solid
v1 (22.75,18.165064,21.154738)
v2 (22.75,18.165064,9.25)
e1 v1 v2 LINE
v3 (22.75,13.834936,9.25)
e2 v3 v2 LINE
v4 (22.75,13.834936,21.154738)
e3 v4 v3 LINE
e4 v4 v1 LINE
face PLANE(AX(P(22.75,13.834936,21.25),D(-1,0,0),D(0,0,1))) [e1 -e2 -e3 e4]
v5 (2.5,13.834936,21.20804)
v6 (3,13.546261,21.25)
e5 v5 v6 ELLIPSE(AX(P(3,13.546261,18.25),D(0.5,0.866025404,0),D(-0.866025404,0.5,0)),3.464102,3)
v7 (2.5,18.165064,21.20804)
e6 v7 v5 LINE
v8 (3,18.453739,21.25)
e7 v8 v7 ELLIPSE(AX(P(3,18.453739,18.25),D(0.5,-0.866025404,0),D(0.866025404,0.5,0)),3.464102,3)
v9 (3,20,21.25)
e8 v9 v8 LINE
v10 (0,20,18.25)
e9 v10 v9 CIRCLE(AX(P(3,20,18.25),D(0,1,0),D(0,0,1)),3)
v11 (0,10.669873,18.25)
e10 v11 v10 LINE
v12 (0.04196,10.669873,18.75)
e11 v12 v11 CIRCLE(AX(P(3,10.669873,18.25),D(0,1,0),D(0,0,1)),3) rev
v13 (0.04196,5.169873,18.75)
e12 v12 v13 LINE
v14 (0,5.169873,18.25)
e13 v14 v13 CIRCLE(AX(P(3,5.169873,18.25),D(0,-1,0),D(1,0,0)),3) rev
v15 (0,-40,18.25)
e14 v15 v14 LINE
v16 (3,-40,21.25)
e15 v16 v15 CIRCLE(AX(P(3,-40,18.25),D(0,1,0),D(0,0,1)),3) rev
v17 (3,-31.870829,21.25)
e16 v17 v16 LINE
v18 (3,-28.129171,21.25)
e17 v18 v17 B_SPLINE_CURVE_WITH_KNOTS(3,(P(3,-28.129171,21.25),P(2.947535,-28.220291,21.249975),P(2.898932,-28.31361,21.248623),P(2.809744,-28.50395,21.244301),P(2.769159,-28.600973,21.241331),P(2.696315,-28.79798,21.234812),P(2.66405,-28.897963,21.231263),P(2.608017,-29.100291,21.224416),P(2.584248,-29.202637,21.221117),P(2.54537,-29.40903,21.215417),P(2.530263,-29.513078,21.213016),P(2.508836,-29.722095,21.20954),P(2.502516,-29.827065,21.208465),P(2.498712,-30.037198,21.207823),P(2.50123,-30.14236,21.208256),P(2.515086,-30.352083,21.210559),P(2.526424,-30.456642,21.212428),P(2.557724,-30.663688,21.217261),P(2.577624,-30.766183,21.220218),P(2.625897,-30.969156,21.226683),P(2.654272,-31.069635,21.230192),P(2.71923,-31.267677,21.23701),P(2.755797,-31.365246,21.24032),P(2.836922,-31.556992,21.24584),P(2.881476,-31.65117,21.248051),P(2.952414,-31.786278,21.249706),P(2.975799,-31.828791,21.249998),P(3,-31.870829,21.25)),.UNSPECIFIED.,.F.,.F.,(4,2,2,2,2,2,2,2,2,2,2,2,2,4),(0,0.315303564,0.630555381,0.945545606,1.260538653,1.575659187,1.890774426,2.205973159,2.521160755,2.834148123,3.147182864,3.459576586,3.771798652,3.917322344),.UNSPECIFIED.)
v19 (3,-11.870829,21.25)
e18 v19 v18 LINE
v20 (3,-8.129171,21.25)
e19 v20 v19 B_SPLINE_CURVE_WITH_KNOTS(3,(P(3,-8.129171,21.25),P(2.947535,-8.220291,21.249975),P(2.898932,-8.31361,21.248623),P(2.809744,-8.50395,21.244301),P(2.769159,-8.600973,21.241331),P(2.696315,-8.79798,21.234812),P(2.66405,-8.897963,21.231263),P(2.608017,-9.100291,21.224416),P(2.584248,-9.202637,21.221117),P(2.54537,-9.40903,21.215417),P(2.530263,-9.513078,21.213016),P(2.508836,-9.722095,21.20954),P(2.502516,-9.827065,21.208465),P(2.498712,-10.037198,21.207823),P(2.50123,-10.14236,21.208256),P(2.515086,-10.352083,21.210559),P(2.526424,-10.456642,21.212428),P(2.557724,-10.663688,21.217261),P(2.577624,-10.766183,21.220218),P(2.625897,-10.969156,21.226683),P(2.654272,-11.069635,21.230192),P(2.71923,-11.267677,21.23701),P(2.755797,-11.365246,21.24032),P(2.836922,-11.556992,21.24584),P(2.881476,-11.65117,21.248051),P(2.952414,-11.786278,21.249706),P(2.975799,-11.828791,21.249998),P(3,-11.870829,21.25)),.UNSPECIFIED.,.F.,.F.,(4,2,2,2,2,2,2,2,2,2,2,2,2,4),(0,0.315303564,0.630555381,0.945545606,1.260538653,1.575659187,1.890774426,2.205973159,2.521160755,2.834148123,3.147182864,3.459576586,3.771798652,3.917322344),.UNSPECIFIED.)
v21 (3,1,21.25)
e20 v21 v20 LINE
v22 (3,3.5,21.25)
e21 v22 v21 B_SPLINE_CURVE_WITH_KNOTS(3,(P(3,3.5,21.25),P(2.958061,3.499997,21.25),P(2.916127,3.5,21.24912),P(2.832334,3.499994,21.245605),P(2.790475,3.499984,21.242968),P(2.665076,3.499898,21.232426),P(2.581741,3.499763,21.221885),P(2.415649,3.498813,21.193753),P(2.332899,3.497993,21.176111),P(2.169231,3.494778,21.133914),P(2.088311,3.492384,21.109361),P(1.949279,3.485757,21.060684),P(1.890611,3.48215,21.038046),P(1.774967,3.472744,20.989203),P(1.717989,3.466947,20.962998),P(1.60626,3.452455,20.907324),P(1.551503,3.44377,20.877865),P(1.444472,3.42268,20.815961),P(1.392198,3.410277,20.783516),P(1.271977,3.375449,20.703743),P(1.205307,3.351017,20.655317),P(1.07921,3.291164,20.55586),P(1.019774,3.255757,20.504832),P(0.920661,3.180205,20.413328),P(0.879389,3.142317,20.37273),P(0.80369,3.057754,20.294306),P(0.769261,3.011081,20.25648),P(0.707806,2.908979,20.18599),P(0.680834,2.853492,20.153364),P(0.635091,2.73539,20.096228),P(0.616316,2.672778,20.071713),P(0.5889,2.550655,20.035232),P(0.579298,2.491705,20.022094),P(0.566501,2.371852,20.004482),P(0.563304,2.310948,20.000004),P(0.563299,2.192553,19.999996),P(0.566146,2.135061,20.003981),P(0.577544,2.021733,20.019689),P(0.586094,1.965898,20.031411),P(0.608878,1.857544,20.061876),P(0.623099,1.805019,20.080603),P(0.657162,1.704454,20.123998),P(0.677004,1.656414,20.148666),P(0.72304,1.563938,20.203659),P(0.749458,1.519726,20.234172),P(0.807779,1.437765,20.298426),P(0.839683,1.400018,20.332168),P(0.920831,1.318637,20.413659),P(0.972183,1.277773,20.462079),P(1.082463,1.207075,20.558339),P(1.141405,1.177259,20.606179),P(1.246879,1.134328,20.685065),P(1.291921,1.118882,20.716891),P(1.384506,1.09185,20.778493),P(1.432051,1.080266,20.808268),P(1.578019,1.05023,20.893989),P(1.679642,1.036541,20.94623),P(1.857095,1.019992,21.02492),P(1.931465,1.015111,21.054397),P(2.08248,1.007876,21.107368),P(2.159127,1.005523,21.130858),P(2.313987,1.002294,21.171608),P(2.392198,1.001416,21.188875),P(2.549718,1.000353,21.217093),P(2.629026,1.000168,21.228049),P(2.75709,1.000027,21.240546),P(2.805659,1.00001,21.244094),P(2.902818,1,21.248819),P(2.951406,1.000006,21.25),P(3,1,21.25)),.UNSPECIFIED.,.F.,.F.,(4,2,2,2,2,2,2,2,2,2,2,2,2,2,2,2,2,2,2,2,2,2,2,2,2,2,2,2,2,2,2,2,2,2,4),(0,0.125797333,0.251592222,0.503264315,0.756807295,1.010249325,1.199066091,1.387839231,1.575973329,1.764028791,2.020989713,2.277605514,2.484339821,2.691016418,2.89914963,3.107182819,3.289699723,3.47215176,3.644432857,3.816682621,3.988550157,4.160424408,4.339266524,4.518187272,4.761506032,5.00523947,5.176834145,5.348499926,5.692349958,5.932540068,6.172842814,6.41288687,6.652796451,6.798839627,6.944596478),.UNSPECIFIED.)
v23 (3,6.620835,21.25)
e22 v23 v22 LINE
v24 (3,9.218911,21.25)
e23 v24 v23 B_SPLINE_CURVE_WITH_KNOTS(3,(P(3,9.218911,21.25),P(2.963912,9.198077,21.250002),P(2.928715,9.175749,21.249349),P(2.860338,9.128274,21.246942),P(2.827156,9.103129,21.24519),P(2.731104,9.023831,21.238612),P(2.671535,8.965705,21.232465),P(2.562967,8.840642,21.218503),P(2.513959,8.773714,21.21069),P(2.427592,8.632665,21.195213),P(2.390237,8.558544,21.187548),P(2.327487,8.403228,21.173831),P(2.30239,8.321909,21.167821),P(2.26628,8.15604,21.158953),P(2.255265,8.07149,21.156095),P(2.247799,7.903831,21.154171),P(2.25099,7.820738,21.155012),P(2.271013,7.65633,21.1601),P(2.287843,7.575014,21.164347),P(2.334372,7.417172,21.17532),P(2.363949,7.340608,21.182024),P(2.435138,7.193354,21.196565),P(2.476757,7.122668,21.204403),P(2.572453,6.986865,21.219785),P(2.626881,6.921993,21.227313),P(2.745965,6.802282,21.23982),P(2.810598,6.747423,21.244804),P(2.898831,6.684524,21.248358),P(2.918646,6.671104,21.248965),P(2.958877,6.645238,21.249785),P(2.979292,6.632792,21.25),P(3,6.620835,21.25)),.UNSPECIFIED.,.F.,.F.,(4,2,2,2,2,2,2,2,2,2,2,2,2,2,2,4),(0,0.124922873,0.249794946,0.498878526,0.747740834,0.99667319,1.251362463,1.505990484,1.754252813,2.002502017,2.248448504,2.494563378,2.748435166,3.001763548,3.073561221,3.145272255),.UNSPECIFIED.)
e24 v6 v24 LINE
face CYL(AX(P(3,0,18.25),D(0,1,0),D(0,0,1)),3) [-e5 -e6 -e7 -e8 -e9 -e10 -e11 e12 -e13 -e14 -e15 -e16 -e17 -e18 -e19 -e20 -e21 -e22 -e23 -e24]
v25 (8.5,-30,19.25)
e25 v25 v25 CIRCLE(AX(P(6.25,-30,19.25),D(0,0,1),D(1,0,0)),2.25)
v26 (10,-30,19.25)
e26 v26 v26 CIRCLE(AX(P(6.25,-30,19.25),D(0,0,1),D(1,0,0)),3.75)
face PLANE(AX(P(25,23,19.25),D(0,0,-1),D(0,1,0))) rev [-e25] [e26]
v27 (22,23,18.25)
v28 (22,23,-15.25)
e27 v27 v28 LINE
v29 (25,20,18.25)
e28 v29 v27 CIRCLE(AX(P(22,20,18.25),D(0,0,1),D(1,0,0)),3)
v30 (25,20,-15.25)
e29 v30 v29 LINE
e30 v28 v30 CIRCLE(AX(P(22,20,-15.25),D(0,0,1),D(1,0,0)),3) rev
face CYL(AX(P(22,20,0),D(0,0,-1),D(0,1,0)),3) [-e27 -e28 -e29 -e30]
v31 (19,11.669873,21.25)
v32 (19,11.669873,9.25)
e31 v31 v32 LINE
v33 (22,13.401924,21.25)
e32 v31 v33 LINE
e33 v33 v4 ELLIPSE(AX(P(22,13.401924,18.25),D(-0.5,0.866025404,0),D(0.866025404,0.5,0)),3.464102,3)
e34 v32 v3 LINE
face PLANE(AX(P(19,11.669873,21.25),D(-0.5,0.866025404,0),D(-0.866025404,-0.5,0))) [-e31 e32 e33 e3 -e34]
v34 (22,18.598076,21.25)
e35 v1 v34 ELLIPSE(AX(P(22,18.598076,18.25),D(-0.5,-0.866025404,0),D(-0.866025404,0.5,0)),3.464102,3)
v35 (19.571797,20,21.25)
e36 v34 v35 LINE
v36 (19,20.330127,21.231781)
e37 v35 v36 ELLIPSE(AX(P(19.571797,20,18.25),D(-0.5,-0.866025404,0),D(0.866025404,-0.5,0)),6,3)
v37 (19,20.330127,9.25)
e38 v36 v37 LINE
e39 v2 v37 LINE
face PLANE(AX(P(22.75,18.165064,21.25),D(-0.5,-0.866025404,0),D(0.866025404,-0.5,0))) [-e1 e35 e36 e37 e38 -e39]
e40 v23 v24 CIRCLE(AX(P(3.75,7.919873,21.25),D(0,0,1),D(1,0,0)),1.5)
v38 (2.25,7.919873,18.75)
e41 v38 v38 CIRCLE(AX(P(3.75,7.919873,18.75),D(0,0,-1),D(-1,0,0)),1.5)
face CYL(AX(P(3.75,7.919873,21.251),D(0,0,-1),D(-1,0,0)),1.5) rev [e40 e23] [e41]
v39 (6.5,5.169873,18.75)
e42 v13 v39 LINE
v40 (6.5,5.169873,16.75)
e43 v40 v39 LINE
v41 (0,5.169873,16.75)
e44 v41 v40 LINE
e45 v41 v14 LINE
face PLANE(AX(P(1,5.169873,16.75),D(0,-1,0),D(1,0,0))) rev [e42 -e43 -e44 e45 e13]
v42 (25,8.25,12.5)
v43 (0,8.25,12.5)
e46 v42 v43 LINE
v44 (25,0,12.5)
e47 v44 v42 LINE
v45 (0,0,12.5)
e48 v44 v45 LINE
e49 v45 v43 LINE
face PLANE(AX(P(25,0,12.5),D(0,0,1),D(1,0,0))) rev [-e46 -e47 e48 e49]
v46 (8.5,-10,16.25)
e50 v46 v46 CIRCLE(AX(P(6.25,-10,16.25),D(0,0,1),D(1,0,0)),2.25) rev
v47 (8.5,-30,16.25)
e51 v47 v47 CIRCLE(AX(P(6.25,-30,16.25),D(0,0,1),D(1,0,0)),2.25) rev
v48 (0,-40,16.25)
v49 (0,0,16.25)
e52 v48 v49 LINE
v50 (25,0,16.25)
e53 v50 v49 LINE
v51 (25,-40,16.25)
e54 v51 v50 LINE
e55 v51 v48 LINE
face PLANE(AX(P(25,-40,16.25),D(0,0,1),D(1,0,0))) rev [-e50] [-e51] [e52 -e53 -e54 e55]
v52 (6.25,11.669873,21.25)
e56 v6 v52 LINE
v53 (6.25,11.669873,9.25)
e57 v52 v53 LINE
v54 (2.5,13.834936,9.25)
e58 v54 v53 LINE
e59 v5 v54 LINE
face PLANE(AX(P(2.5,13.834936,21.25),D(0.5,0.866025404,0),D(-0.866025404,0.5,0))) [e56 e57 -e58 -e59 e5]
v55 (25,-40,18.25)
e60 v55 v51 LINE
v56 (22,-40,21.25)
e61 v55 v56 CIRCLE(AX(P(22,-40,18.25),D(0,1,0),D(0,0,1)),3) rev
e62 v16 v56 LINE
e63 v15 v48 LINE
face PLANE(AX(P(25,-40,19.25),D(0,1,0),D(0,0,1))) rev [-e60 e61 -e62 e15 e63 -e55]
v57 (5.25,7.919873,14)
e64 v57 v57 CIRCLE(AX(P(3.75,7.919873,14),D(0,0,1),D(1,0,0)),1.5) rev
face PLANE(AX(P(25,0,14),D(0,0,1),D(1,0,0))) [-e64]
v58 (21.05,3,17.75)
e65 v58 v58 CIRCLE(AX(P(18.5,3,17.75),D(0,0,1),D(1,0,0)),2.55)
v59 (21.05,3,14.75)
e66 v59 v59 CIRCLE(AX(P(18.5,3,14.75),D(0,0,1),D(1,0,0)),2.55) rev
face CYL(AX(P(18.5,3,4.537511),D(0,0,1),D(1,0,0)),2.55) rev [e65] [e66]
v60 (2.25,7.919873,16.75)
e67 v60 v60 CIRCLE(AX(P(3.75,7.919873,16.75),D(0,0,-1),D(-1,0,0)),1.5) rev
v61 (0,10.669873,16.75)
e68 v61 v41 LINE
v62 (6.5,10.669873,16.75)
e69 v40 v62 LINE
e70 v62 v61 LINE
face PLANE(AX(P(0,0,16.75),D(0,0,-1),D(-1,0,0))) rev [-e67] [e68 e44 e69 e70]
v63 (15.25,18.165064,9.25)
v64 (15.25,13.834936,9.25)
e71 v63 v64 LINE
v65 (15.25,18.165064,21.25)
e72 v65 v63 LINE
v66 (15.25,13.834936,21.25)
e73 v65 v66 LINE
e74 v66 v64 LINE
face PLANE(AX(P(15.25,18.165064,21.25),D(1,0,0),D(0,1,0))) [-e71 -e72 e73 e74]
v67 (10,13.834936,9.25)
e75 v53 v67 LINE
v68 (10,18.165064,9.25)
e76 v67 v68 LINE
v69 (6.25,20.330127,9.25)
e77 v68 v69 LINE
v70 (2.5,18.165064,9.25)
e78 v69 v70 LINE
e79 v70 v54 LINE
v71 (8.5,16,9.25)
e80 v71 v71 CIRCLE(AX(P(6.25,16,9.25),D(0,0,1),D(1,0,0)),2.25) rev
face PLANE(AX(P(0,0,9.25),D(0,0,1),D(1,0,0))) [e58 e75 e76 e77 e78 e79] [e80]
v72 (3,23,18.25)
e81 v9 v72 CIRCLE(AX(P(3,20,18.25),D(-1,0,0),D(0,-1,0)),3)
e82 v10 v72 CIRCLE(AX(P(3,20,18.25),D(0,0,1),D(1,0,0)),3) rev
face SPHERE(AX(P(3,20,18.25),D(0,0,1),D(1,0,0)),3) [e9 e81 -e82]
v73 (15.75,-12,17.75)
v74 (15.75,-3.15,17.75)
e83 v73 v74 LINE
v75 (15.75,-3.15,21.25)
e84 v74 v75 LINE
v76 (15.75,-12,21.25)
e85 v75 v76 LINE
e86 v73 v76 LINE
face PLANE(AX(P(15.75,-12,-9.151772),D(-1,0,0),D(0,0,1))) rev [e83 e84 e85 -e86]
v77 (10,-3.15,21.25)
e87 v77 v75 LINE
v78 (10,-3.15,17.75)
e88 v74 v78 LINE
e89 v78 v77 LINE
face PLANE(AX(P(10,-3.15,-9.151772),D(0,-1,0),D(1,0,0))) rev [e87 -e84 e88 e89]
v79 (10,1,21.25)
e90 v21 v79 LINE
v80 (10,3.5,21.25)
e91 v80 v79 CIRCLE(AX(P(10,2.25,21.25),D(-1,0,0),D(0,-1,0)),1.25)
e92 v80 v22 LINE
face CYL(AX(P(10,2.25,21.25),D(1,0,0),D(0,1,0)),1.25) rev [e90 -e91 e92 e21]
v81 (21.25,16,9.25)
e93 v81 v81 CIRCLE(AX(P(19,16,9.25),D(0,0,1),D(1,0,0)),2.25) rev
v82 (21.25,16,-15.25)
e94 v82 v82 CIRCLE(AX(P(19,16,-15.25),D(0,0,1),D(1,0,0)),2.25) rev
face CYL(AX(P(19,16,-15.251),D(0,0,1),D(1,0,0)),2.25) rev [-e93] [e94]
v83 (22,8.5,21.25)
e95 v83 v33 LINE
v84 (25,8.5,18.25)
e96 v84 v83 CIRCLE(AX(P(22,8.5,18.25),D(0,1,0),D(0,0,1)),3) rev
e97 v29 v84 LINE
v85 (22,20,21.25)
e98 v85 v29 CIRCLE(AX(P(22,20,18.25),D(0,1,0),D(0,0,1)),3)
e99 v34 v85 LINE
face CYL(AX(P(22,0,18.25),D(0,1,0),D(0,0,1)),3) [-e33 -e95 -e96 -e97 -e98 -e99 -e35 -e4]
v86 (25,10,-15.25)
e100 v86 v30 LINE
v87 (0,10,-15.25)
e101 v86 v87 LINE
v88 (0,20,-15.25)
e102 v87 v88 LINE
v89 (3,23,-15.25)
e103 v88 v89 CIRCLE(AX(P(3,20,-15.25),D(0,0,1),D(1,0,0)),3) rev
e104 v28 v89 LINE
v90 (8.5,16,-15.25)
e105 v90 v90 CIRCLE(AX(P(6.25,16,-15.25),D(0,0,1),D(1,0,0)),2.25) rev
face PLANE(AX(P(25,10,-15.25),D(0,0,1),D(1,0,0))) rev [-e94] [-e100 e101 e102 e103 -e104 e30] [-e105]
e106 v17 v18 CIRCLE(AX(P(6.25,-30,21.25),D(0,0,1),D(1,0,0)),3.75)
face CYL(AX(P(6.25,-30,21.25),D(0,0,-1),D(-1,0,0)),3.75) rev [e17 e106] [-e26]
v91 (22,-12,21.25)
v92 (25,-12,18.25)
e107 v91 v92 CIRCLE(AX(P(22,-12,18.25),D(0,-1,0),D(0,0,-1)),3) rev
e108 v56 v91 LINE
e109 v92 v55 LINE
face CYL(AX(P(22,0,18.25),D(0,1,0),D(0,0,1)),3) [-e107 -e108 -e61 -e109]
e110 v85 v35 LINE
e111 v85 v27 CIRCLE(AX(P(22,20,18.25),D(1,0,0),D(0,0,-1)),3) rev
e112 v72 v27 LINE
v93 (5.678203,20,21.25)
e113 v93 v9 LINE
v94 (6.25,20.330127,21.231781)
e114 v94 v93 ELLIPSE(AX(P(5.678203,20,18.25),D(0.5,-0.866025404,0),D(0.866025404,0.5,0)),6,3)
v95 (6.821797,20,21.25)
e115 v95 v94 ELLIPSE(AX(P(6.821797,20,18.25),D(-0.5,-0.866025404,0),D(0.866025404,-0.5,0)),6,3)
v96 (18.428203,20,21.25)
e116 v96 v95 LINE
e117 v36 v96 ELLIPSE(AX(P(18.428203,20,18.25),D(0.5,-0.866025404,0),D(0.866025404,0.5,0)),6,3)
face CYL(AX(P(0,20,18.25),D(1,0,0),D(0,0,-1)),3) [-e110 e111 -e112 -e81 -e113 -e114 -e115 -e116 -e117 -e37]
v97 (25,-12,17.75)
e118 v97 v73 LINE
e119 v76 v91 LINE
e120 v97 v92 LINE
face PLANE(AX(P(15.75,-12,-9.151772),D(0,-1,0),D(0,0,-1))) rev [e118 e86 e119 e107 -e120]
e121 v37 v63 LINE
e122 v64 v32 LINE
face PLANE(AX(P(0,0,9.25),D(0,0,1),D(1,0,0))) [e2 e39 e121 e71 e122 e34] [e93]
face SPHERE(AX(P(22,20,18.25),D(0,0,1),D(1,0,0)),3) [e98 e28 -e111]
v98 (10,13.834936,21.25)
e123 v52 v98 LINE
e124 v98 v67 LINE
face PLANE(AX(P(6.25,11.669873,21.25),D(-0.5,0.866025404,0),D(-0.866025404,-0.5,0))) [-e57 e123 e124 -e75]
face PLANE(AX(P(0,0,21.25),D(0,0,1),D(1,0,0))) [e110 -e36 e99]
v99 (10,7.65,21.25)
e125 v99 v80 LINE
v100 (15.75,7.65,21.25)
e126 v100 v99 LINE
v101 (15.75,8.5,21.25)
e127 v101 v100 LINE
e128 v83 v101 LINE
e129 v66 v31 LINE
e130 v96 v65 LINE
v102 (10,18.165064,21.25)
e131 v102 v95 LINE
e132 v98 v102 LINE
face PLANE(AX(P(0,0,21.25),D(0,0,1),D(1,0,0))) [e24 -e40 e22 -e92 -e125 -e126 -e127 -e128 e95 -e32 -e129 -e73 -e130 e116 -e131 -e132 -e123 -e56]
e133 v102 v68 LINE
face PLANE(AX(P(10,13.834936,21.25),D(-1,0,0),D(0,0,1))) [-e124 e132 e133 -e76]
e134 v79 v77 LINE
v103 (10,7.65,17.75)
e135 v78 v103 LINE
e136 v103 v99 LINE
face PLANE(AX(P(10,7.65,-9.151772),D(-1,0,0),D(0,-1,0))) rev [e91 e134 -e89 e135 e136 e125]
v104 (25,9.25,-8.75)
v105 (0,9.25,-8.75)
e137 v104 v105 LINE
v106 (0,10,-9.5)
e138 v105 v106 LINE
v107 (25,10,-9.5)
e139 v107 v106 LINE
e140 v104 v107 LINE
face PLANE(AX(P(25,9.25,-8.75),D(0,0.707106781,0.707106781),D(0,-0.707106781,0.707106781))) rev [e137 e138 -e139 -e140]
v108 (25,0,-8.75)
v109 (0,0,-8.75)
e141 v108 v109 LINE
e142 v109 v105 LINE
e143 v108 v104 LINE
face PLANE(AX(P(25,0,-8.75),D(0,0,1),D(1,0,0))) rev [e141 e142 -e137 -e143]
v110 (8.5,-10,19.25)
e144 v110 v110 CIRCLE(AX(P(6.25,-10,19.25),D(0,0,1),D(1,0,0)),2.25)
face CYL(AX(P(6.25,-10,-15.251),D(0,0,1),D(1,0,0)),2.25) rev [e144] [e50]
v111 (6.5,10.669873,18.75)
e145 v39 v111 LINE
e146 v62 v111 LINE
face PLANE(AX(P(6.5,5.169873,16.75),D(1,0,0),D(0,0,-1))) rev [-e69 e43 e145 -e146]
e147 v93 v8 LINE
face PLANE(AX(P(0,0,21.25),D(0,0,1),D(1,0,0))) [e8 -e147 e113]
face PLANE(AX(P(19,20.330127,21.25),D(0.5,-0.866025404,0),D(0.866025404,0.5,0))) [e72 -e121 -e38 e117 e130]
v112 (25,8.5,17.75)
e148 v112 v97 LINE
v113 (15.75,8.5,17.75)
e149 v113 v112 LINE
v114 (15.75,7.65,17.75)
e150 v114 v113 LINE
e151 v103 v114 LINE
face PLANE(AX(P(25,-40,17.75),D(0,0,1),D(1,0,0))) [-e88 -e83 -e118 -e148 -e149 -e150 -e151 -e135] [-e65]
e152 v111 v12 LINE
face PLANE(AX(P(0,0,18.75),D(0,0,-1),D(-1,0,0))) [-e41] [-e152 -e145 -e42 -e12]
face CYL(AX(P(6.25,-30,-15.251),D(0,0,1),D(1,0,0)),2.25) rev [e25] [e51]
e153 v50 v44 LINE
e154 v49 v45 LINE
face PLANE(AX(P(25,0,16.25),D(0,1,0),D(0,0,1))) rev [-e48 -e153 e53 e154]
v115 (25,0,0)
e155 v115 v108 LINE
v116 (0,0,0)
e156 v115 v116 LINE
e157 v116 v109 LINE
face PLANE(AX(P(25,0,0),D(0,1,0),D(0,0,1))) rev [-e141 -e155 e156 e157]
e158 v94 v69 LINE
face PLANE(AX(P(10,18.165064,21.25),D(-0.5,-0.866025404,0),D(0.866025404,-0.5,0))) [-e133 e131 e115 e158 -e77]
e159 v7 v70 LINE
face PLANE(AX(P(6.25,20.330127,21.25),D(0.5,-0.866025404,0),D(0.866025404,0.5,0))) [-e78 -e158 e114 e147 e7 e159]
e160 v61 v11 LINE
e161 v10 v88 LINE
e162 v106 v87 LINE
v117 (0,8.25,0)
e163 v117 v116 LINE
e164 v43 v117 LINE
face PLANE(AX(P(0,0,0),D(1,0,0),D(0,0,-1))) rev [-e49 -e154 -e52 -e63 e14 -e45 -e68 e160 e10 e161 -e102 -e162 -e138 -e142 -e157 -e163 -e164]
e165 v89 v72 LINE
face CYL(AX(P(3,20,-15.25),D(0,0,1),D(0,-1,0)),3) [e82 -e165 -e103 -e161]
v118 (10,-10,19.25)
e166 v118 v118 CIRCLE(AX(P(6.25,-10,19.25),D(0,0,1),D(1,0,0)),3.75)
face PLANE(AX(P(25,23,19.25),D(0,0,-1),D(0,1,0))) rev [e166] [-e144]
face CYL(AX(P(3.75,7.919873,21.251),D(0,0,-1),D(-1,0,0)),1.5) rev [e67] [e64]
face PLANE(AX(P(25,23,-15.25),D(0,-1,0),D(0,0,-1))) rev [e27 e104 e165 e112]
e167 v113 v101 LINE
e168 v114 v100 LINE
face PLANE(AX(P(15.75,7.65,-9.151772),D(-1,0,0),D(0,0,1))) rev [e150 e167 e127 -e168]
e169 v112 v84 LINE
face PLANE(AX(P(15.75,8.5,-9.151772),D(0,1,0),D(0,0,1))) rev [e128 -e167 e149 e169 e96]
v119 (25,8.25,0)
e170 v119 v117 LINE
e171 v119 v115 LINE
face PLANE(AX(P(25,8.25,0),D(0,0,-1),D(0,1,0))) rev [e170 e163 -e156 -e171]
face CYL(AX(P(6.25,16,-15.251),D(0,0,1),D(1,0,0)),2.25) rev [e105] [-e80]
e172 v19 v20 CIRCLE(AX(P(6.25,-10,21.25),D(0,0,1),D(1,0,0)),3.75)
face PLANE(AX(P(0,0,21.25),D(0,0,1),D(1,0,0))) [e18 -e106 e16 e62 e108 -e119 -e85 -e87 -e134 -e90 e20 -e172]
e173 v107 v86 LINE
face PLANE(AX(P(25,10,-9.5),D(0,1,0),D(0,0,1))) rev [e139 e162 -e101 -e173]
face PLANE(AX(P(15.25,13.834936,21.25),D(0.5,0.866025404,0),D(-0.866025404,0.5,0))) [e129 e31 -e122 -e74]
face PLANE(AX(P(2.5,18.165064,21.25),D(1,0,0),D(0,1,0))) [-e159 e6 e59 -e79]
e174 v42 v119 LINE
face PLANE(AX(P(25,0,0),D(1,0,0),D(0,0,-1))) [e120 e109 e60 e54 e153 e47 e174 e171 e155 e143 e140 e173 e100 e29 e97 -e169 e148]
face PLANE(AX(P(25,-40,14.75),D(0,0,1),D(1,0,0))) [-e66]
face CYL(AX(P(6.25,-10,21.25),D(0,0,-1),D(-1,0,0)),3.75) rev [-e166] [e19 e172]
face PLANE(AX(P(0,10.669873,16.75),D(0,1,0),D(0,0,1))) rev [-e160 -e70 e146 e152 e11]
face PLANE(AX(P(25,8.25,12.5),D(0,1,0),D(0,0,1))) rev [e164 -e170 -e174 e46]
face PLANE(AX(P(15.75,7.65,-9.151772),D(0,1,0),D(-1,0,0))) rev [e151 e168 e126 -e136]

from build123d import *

# Parameters (mm, degrees)
BOSS_EXTRUDE1_DEPTH            = 25
CUT_EXTRUDE1_REACH             = 60.44
SKETCH2_R                      = 2.25
SKETCH3_W                      = 25
SKETCH3_H                      = 63
SKETCH3_R                      = 3.75
BOSS_EXTRUDE2_DEPTH            = 2
FILLET1_R                      = 3
SKETCH4_R                      = 2.55
CUT_EXTRUDE2_DEPTH             = 3.5
SKETCH4_3_R                    = 2.55
CUT_EXTRUDE5_DEPTH             = 6.5
SKETCH6_W                      = 10
SKETCH6_H                      = 1.25
SKETCH5_R                      = 1.5
CUT_EXTRUDE3_DEPTH             = 1
SKETCH5_2_R                    = 1.5
CUT_EXTRUDE4_DEPTH             = 3.75
CUT_EXTRUDE4_DIRECTION_2_REACH = 59.567
CUT_EXTRUDE6_DEPTH             = 10


with BuildPart() as part:
    # Sketch1 → Boss-Extrude1 (new body)
    with BuildSketch(Plane(origin=(0, 0, 0), x_dir=(0, 0, -1), z_dir=(1, 0, 0))):
        Polygon((8.75, 0), (8.75, 9.25), (9.5, 10), (15.25, 10), (15.25, 23), (-19.25, 23), (-19.25, -40), (-16.25, -40), (-16.25, 0), (-12.5, 0), (-12.5, 8.25), (0, 8.25), (0, 0), (3.75, 0), align=None)
    extrude(amount=BOSS_EXTRUDE1_DEPTH)

    # Sketch2 → Cut-Extrude1 (cut, up to next)
    with BuildSketch(Plane.XY.offset(19.25), mode=Mode.PRIVATE) as cut_extrude1_sk1:
        with Locations((6.25, -30)):
            Circle(SKETCH2_R)
    cut_extrude1_tool1 = extrude(cut_extrude1_sk1.sketch, amount=-CUT_EXTRUDE1_REACH, mode=Mode.PRIVATE) & part.part
    # Sketch2 → Cut-Extrude1 (cut, up to next)
    with BuildSketch(Plane.XY.offset(19.25), mode=Mode.PRIVATE) as cut_extrude1_sk2:
        with Locations((6.25, -10)):
            Circle(SKETCH2_R)
    cut_extrude1_tool2 = extrude(cut_extrude1_sk2.sketch, amount=-CUT_EXTRUDE1_REACH, mode=Mode.PRIVATE) & part.part
    # Sketch2 → Cut-Extrude1 (cut, up to next)
    with BuildSketch(Plane.XY.offset(19.25), mode=Mode.PRIVATE) as cut_extrude1_sk3:
        with Locations((6.25, 16)):
            Circle(SKETCH2_R)
    cut_extrude1_tool3 = extrude(cut_extrude1_sk3.sketch, amount=-CUT_EXTRUDE1_REACH, mode=Mode.PRIVATE) & part.part
    # Sketch2 → Cut-Extrude1 (cut, up to next)
    with BuildSketch(Plane.XY.offset(19.25), mode=Mode.PRIVATE) as cut_extrude1_sk4:
        with Locations((19, 16)):
            Circle(SKETCH2_R)
    cut_extrude1_tool4 = extrude(cut_extrude1_sk4.sketch, amount=-CUT_EXTRUDE1_REACH, mode=Mode.PRIVATE) & part.part
    add(cut_extrude1_tool1.solids().sort_by_distance((6.25, -30, 19.25))[0], mode=Mode.SUBTRACT)
    add(cut_extrude1_tool2.solids().sort_by_distance((6.25, -10, 19.25))[0], mode=Mode.SUBTRACT)
    add(cut_extrude1_tool3.solids().sort_by_distance((6.25, 16, 19.25))[0], mode=Mode.SUBTRACT)
    add(cut_extrude1_tool4.solids().sort_by_distance((19, 16, 19.25))[0], mode=Mode.SUBTRACT)

    # Sketch3 → Boss-Extrude2 (add)
    with BuildSketch(Plane.XY.offset(19.25)):
        with Locations((12.5, -8.5)):
            Rectangle(SKETCH3_W, SKETCH3_H)
        with Locations((6.25, -30)):
            Circle(SKETCH3_R, mode=Mode.SUBTRACT)
        with Locations((6.25, -10)):
            Circle(SKETCH3_R, mode=Mode.SUBTRACT)
        Polygon((10, 18.165063509), (6.25, 20.330127019), (2.5, 18.165063509), (2.5, 13.834936491), (6.25, 11.669872981), (10, 13.834936491), align=None, mode=Mode.SUBTRACT)
        Polygon((19, 20.330127019), (15.25, 18.165063509), (15.25, 13.834936491), (19, 11.669872981), (22.75, 13.834936491), (22.75, 18.165063509), align=None, mode=Mode.SUBTRACT)
    extrude(amount=BOSS_EXTRUDE2_DEPTH)

    # Fillet1
    # the kernel refuses this fillet: 3 mm, written as the material it takes off along each edge
    with BuildSketch(Plane(origin=(3, 20, 18.25), x_dir=(0, 0, 1), z_dir=(-1, 0, 0))) as fillet1_piece_1_section:
        Polygon((0, 0), (FILLET1_R, 0), (FILLET1_R, FILLET1_R), (0, FILLET1_R), align=None)
    fillet1_piece_1 = extrude(amount=FILLET1_R, mode=Mode.PRIVATE)
    fillet1_piece_1 = fillet1_piece_1 - Plane(origin=(3, 20, 18.25), x_dir=(0, -0.7071067811865475, -0.7071067811865475), z_dir=(-1, 0, 0)) * Sphere(FILLET1_R, mode=Mode.PRIVATE)
    add(fillet1_piece_1, mode=Mode.SUBTRACT)
    with BuildSketch(Plane(origin=(22, 20, 18.25), x_dir=(0, 0, 1), z_dir=(1, 0, 0))) as fillet1_piece_2_section:
        Polygon((0, 0), (FILLET1_R, 0), (FILLET1_R, -FILLET1_R), (0, -FILLET1_R), align=None)
    fillet1_piece_2 = extrude(amount=FILLET1_R, mode=Mode.PRIVATE)
    fillet1_piece_2 = fillet1_piece_2 - Plane(origin=(22, 20, 18.25), x_dir=(0, -0.7071067811865475, -0.7071067811865475), z_dir=(1, 0, 0)) * Sphere(FILLET1_R, mode=Mode.PRIVATE)
    add(fillet1_piece_2, mode=Mode.SUBTRACT)
    with BuildSketch(Plane(origin=(0, 23, 18.25), x_dir=(1, 0, 0), z_dir=(0, 0, -1))) as fillet1_piece_3:
        with BuildLine():
            CenterArc((FILLET1_R, FILLET1_R), FILLET1_R, 180, 90)
            Line((0, FILLET1_R), (0, 0))
            Line((0, 0), (FILLET1_R, 0))
        make_face()
    extrude(amount=41, mode=Mode.SUBTRACT)
    with BuildSketch(Plane(origin=(25, 23, -22.75), x_dir=(0, -1, 0), z_dir=(0, 0, 1))) as fillet1_piece_4:
        with BuildLine():
            CenterArc((FILLET1_R, -FILLET1_R), FILLET1_R, 90, 90)
            Line((0, -FILLET1_R), (0, 0))
            Line((0, 0), (FILLET1_R, 0))
        make_face()
    extrude(amount=41, mode=Mode.SUBTRACT)
    with BuildSketch(Plane(origin=(22, 23, 21.25), x_dir=(0, -1, 0), z_dir=(-1, 0, 0))) as fillet1_piece_5:
        with BuildLine():
            CenterArc((FILLET1_R, -FILLET1_R), FILLET1_R, 90, 90)
            Line((0, -FILLET1_R), (0, 0))
            Line((0, 0), (FILLET1_R, 0))
        make_face()
    extrude(amount=19, mode=Mode.SUBTRACT)
    with BuildSketch(Plane(origin=(25, -47.5, 21.25), x_dir=(0, 0, -1), z_dir=(0, 1, 0))) as fillet1_piece_6:
        with BuildLine():
            CenterArc((FILLET1_R, FILLET1_R), FILLET1_R, 180, 90)
            Line((0, FILLET1_R), (0, 0))
            Line((0, 0), (FILLET1_R, 0))
        make_face()
    extrude(amount=67.5, mode=Mode.SUBTRACT)
    with BuildSketch(Plane(origin=(0, 20, 21.25), x_dir=(1, 0, 0), z_dir=(0, -1, 0))) as fillet1_piece_7:
        with BuildLine():
            CenterArc((FILLET1_R, -FILLET1_R), FILLET1_R, 90, 90)
            Line((0, -FILLET1_R), (0, 0))
            Line((0, 0), (FILLET1_R, 0))
        make_face()
    extrude(amount=67.5, mode=Mode.SUBTRACT)

    # Sketch4 → Cut-Extrude2 (cut)
    with BuildSketch(Plane.XY.offset(21.25)):
        Polygon((15.75, -12), (25, -12), (25, 8.5), (15.75, 8.5), (15.75, 7.65), (10, 7.65), (10, -3.15), (15.75, -3.15), align=None)
        with Locations((18.5, 3)):
            Circle(SKETCH4_R, mode=Mode.SUBTRACT)
    extrude(amount=-CUT_EXTRUDE2_DEPTH, mode=Mode.SUBTRACT)

    # Sketch4<3> → Cut-Extrude5 (cut)
    with BuildSketch(Plane.XY.offset(21.25)):
        with Locations((18.5, 3)):
            Circle(SKETCH4_3_R)
    extrude(amount=-CUT_EXTRUDE5_DEPTH, mode=Mode.SUBTRACT)

    # Sketch6 → Cut-Revolve1 (revolve, cut)
    with BuildSketch(Plane.XY.offset(21.25)):
        with Locations((5, 2.875)):
            Rectangle(SKETCH6_W, SKETCH6_H)
    revolve(axis=Axis((10, 2.25, 21.25), (-1, 0, 0)), mode=Mode.SUBTRACT)

    # Sketch5 → Cut-Extrude3 (cut, symmetric)
    with BuildSketch(Plane.XY.offset(17.75)):
        Polygon((1, 5.169872981), (6.5, 5.169872981), (6.5, 10.669872981), (1, 10.669872981), (0, 10.669872981), (0, 5.169872981), align=None)
        with Locations((3.75, 7.919872981)):
            Circle(SKETCH5_R, mode=Mode.SUBTRACT)
    extrude(amount=CUT_EXTRUDE3_DEPTH, both=True, mode=Mode.SUBTRACT)

    # Sketch5<2> → Cut-Extrude4 (cut)
    with BuildSketch(Plane.XY.offset(17.75)):
        with Locations(Location((3.75, 7.919872981, 0), (0, 0, 180))):
            Circle(SKETCH5_2_R)
    extrude(amount=-CUT_EXTRUDE4_DEPTH, mode=Mode.SUBTRACT)

    # Sketch5<2> → Cut-Extrude4 direction 2 (cut, up to next)
    with BuildSketch(Plane.XY.offset(17.75), mode=Mode.PRIVATE) as cut_extrude4_direction_2_sk1:
        with Locations(Location((3.75, 7.919872981, 0), (0, 0, 180))):
            Circle(SKETCH5_2_R)
    cut_extrude4_direction_2_tool1 = extrude(cut_extrude4_direction_2_sk1.sketch, amount=CUT_EXTRUDE4_DIRECTION_2_REACH, mode=Mode.PRIVATE) & part.part
    add(cut_extrude4_direction_2_tool1.solids().sort_by_distance((3.75, 7.919873, 17.75))[0], mode=Mode.SUBTRACT)

    # Sketch7 → Cut-Extrude6 (cut)
    with BuildSketch(Plane.XY.offset(19.25)):
        Polygon((22.75, 13.834936491), (22.75, 18.165063509), (19, 20.330127019), (15.25, 18.165063509), (15.25, 13.834936491), (19, 11.669872981), align=None)
        Polygon((6.25, 11.669872981), (10, 13.834936491), (10, 18.165063509), (6.25, 20.330127019), (2.5, 18.165063509), (2.5, 13.834936491), align=None)
    extrude(amount=-CUT_EXTRUDE6_DEPTH, mode=Mode.SUBTRACT)


solid = part.part
